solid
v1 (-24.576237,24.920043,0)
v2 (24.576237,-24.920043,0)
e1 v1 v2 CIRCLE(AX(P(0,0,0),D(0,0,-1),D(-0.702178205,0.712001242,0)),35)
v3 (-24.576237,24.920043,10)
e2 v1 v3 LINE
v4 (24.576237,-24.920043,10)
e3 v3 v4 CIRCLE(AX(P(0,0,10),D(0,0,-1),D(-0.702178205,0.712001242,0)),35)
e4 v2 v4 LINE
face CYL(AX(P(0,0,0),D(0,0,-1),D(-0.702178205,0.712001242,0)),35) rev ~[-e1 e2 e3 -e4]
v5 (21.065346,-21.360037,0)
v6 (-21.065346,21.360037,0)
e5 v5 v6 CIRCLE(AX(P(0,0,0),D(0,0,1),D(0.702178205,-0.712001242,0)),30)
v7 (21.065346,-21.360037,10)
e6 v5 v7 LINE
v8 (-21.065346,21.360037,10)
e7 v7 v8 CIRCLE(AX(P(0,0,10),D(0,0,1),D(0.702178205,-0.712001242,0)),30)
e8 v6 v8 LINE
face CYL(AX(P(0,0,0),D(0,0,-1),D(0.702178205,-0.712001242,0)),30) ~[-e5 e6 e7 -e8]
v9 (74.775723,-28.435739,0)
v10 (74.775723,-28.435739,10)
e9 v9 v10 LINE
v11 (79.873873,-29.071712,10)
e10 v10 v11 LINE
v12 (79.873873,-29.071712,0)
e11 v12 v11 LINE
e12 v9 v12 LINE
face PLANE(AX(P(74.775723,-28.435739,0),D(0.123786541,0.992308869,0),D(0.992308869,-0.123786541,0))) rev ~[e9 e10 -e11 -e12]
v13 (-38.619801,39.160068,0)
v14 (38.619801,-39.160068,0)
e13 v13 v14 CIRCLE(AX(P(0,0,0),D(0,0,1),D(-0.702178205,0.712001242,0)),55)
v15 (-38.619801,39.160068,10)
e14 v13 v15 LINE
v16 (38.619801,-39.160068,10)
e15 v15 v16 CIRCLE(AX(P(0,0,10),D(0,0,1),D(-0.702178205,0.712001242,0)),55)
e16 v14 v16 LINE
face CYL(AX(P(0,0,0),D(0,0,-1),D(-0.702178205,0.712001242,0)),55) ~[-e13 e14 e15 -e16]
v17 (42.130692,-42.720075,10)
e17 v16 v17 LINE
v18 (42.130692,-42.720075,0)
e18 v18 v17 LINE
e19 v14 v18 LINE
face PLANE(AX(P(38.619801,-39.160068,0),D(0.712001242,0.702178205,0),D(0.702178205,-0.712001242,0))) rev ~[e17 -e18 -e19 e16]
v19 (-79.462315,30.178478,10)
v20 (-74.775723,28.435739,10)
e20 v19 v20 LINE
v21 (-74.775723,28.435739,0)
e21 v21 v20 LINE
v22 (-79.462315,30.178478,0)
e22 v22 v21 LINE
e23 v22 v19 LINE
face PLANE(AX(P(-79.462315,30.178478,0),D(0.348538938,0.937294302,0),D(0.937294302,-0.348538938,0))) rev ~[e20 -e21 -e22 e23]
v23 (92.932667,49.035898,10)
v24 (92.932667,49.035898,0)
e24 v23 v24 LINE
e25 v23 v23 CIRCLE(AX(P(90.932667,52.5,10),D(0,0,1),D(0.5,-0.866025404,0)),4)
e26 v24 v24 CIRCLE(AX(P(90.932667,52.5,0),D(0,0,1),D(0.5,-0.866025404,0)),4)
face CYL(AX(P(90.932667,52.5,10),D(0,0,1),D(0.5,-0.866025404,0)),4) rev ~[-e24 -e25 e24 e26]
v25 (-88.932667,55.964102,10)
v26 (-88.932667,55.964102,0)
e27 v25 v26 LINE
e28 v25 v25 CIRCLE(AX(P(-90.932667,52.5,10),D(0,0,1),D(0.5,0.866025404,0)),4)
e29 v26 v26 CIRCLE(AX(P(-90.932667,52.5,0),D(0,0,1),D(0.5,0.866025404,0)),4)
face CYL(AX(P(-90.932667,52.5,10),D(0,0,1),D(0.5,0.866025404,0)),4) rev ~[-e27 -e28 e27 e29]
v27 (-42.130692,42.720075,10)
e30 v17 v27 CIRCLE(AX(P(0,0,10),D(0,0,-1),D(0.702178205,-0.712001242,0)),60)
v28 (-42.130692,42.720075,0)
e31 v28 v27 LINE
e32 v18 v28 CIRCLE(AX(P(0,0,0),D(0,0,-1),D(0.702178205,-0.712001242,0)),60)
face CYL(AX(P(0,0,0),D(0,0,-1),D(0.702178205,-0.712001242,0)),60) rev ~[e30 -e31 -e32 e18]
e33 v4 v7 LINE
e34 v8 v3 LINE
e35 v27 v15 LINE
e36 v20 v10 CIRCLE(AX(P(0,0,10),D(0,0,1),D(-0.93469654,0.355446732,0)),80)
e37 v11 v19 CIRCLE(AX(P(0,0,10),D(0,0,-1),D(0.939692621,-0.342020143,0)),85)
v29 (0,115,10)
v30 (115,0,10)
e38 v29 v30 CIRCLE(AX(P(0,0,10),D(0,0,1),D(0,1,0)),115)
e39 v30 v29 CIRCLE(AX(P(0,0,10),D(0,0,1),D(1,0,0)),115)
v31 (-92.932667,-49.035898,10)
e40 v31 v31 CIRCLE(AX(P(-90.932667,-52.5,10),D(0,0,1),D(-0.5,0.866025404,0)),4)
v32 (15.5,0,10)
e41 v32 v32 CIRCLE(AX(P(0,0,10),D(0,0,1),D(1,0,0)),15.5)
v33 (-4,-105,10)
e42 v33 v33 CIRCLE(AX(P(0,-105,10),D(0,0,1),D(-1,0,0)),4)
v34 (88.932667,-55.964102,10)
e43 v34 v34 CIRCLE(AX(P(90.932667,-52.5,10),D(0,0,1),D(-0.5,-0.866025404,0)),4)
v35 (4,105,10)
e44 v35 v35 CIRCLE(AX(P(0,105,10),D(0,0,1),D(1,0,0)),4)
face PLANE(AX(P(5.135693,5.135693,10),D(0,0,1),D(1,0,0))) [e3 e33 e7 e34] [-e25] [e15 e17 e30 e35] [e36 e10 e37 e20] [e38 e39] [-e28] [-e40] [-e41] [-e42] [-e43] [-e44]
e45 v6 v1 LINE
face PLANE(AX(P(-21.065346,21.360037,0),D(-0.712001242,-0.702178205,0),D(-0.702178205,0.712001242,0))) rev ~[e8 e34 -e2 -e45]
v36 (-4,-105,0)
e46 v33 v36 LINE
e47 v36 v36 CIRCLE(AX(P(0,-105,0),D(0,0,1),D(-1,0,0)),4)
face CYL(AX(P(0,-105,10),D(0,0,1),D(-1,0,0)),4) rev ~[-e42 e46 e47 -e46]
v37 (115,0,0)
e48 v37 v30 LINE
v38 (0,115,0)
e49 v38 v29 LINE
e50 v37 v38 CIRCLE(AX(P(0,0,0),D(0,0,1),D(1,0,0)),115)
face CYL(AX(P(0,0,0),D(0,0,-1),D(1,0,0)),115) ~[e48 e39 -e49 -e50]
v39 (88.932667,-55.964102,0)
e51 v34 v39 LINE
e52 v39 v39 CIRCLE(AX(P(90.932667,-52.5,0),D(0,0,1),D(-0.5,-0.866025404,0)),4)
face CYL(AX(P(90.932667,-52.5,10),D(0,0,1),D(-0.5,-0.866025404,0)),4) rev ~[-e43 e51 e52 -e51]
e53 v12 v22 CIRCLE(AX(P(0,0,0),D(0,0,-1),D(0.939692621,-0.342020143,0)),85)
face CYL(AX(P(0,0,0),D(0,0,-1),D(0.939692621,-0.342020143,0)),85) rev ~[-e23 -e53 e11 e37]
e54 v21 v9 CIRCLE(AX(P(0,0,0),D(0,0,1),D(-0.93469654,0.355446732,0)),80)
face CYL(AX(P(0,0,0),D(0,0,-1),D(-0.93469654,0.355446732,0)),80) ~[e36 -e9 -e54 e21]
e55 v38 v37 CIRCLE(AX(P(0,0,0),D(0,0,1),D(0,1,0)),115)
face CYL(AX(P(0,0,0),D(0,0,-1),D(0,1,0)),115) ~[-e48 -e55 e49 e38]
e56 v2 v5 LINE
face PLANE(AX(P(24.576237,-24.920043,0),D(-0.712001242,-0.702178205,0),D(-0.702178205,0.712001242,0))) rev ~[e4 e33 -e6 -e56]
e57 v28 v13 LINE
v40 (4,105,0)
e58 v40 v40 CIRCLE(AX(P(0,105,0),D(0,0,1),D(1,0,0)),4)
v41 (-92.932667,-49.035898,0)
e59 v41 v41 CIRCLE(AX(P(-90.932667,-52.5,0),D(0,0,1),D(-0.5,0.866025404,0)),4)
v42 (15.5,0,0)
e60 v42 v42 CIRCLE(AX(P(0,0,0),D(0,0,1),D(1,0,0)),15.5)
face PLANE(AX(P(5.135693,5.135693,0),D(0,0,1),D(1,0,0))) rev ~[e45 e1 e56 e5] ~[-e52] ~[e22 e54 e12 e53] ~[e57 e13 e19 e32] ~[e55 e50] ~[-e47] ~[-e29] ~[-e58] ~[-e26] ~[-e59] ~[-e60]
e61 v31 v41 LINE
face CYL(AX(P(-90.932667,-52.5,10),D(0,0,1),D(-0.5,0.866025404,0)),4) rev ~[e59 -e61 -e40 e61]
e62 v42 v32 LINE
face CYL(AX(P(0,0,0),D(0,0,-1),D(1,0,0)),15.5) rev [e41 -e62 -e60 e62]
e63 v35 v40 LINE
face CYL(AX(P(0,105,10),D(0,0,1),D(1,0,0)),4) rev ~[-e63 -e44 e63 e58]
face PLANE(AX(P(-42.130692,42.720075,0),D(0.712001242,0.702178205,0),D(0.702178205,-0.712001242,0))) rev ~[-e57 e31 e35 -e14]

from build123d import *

# Parameters (mm, degrees)
F0_R            = 15.5
F1_DEPTH        = 10
F2_R            = 4
F3_DEPTH        = 25
F3_COPIES_COUNT = 6


# Not quite as in the source:
# - a pattern or mirror of a feature is missing from the dataset's text; its kind, count and spacing are read off the source's solid


with BuildPart() as f1:
    # F0 (on Top) → F1 (new body)
    with BuildSketch(Plane.XY):
        with BuildLine():
            ThreePointArc((115, 0), (81.3172798365, 81.3172798365), (0, 115))
            ThreePointArc((0, 115), (-81.3172798365, -81.3172798365), (115, 0))
        make_face()
        with BuildLine():
            ThreePointArc((79.8738727668, -29.0717121827), (-29.6258097027, -79.6700156863), (-79.4623147975, 30.1784778779))
            Line((-79.4623147975, 30.1784778779), (-74.7757231643, 28.4357385213))
            ThreePointArc((-74.7757231643, 28.4357385213), (-28.4357385213, -74.7757231643), (74.7757231643, -28.4357385213))
            Line((74.7757231643, -28.4357385213), (79.8738727668, -29.0717121827))
        make_face(mode=Mode.SUBTRACT)
        with BuildLine():
            Line((-42.1306922898, 42.7200745222), (-38.6198012657, 39.160068312))
            ThreePointArc((-38.6198012657, 39.160068312), (-39.160068312, -38.6198012657), (38.6198012657, -39.160068312))
            Line((38.6198012657, -39.160068312), (42.1306922898, -42.7200745222))
            ThreePointArc((42.1306922898, -42.7200745222), (-42.7200745222, -42.1306922898), (-42.1306922898, 42.7200745222))
        make_face(mode=Mode.SUBTRACT)
        Circle(F0_R, mode=Mode.SUBTRACT)
        with BuildLine():
            ThreePointArc((-24.5762371691, 24.9200434713), (24.9200434713, 24.5762371691), (24.5762371691, -24.9200434713))
            Line((24.5762371691, -24.9200434713), (21.0653461449, -21.3600372611))
            ThreePointArc((21.0653461449, -21.3600372611), (21.3600372611, 21.0653461449), (-21.0653461449, 21.3600372611))
            Line((-21.0653461449, 21.3600372611), (-24.5762371691, 24.9200434713))
        make_face(mode=Mode.SUBTRACT)
    extrude(amount=F1_DEPTH)

    # F2 (on face) → F3 (cut)
    with BuildSketch(Plane.XY.offset(10)):
        with Locations((0, 105)):
            Circle(F2_R)
    f3 = extrude(amount=-F3_DEPTH, mode=Mode.SUBTRACT)

    # F3_copies: F3 ×6 about axis
    f3_copies_axis = Axis((0, 0, 0), (0, 0, 1))
    for i in range(1, F3_COPIES_COUNT):
        add(f3.rotate(f3_copies_axis, i * 360 / F3_COPIES_COUNT), mode=Mode.SUBTRACT)


solid = f1.part
